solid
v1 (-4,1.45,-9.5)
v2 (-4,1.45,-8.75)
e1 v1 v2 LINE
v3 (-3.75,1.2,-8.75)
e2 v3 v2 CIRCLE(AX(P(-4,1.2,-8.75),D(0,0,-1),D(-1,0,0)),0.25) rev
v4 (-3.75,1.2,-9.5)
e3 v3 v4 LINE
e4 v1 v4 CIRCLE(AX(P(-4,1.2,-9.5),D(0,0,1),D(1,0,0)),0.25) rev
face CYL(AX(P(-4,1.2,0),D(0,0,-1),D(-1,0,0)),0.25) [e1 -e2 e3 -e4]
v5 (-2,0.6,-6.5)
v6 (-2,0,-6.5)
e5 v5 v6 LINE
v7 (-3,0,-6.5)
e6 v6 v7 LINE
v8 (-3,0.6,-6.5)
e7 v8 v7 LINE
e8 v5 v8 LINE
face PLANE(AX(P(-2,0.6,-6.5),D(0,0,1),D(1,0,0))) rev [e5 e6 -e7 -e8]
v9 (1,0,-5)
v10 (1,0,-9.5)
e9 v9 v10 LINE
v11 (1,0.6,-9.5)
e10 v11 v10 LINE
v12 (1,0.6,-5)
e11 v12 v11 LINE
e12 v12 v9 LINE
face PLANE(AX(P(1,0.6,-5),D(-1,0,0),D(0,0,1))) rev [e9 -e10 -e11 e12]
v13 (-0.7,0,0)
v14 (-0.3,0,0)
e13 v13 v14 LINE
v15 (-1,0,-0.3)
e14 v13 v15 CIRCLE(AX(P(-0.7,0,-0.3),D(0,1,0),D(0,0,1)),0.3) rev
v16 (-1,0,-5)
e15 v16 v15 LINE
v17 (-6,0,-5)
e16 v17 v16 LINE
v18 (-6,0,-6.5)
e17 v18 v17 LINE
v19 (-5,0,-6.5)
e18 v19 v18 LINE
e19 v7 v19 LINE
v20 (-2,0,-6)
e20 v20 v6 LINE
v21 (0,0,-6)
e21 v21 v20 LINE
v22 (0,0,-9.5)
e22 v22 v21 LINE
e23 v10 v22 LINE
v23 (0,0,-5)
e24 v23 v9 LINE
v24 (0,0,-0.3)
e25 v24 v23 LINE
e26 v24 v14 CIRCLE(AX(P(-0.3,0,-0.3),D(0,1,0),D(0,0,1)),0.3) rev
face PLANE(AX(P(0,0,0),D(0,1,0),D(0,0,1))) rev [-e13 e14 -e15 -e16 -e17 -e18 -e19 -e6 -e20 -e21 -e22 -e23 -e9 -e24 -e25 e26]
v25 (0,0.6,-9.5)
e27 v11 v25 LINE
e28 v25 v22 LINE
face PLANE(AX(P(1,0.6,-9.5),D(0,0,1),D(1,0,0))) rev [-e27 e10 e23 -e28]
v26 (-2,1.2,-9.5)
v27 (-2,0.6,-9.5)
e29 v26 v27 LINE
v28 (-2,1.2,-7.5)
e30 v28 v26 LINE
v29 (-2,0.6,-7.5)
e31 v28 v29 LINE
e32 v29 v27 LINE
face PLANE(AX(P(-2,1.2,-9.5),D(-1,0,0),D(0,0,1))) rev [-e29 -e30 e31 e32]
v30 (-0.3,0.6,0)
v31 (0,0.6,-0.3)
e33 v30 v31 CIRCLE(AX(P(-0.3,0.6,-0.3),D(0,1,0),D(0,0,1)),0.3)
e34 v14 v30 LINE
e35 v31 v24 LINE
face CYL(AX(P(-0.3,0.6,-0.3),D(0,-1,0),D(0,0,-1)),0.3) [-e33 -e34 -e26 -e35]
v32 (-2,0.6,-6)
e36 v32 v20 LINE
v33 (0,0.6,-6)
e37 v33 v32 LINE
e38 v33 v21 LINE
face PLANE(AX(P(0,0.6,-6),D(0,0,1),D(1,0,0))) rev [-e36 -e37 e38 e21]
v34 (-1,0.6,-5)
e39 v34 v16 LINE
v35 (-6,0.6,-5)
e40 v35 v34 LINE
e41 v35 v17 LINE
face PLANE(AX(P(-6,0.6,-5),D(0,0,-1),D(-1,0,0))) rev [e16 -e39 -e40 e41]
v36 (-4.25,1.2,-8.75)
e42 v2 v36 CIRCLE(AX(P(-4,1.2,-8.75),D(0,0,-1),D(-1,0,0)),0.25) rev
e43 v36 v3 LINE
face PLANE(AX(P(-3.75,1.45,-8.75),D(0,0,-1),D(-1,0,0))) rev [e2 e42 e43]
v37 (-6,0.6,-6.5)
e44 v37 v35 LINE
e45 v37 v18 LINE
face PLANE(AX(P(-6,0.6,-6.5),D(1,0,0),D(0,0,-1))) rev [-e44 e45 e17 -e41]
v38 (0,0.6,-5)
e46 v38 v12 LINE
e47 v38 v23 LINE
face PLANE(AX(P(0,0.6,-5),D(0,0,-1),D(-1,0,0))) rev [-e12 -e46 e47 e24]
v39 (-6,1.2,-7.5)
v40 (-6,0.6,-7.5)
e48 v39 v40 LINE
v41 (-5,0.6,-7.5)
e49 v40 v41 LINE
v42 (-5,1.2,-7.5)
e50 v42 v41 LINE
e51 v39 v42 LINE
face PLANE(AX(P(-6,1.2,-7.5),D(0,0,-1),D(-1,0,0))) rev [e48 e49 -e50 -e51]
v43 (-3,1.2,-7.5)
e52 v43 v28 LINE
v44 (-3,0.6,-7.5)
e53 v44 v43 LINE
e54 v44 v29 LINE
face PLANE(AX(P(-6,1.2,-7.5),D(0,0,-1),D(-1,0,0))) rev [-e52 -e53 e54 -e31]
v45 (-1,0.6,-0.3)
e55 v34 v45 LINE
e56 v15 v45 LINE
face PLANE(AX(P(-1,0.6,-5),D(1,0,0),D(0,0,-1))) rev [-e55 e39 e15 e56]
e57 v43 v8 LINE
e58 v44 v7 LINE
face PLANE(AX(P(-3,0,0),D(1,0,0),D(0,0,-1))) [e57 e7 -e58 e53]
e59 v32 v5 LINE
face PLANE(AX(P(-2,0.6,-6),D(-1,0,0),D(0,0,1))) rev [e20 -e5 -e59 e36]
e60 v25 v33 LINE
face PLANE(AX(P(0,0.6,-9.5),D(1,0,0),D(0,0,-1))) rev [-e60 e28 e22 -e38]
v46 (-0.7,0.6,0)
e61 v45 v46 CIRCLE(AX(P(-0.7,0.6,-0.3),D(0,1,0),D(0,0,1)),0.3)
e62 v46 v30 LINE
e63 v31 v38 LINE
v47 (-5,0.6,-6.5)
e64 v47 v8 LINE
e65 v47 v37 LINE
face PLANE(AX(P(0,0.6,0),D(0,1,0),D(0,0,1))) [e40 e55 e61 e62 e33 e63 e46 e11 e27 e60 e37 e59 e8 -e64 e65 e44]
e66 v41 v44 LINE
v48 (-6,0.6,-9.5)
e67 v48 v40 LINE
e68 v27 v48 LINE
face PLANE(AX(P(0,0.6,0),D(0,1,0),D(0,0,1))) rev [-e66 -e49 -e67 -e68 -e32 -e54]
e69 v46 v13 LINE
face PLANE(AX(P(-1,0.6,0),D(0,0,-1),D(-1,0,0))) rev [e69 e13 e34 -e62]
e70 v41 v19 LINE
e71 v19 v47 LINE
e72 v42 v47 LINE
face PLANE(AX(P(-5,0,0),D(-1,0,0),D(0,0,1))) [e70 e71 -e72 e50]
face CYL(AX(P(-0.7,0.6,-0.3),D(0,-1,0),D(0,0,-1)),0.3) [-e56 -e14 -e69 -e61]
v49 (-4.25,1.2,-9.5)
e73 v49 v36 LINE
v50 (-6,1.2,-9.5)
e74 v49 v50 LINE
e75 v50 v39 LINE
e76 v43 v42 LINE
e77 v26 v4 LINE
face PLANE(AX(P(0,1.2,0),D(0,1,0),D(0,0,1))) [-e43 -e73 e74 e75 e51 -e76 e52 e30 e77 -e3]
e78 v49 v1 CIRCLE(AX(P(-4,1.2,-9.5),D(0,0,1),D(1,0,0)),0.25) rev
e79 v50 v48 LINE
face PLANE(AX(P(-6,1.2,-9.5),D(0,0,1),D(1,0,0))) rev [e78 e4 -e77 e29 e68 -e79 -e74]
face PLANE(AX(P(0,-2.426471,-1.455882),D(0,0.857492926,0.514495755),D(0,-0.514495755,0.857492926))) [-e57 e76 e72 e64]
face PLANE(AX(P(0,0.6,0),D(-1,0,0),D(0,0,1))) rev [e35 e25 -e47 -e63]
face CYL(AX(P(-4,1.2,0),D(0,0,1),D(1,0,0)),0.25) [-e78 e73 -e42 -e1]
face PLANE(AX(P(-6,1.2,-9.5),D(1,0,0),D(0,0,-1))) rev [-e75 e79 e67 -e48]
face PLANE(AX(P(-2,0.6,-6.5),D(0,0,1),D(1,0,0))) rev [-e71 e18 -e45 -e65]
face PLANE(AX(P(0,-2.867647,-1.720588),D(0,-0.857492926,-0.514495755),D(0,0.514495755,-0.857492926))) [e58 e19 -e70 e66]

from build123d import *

# Parameters (mm, degrees)
BOSS_EXTRUDE1_DEPTH = 0.6
SKETCH2_W           = 4
SKETCH2_H           = 2
BOSS_EXTRUDE2_DEPTH = 0.6
FILLET1_R           = 0.3
SKETCH5_W           = 0.5
SKETCH5_H           = 0.75
BOSS_EXTRUDE3_DEPTH = 0.25
FILLET2_R           = 0.25


with BuildPart() as part:
    # Sketch1 → Boss-Extrude1 (new body)
    with BuildSketch(Plane(origin=(0, 0, 0), x_dir=(1, 0, 0), z_dir=(0, 1, 0))):
        Polygon((0, 0), (0, 5), (1, 5), (1, 9.5), (0, 9.5), (0, 6), (-2, 6), (-2, 6.5), (-6, 6.5), (-6, 5), (-1, 5), (-1, 0), align=None)
    extrude(amount=BOSS_EXTRUDE1_DEPTH)



with BuildPart() as body_2:
    # Sketch2 → Boss-Extrude2 (new body)
    with BuildSketch(Plane(origin=(0, 0.6, 0), x_dir=(1, 0, 0), z_dir=(0, 1, 0))):
        with Locations((-4, 8.5)):
            Rectangle(SKETCH2_W, SKETCH2_H)
    extrude(amount=BOSS_EXTRUDE2_DEPTH)


with BuildPart() as part_1:
    add(part.part)

    add(body_2.part)  # Loft1 merges body 2
    # Sketch3 → Loft1 section 0
    with BuildSketch(Plane.XY.offset(-7.5)):
        with BuildLine():
            Line((-3, 1.2), (-5, 1.2))
            Line((-5, 1.2), (-5, 0.6))
            Line((-5, 0.6), (-3, 0.6))
            Line((-3, 0.6), (-3, 1.2))
        make_face()
    # Sketch4 → Loft1 section 1
    with BuildSketch(Plane(origin=(0, 0, -6.5), x_dir=(-1, 0, 0), z_dir=(0, 0, -1))):
        with BuildLine():
            Line((3, 0.6), (5, 0.6))
            Line((5, 0.6), (5, 0))
            Line((5, 0), (3, 0))
            Line((3, 0), (3, 0.6))
        make_face()
    loft()

    # Fillet1
    fillet1_edges = [part_1.edges().sort_by_distance(p)[0] for p in [
        (-1, 0.3, 0),
        (0, 0.3, 0),
    ]]
    fillet(fillet1_edges, radius=FILLET1_R)

    # Sketch5 → Boss-Extrude3 (add)
    with BuildSketch(Plane(origin=(0, 1.2, 0), x_dir=(1, 0, 0), z_dir=(0, 1, 0))):
        with Locations((-4, 9.125)):
            Rectangle(SKETCH5_W, SKETCH5_H)
    extrude(amount=BOSS_EXTRUDE3_DEPTH)

    # Fillet2
    fillet2_edges = [part_1.edges().sort_by_distance(p)[0] for p in [
        (-3.75, 1.45, -9.125),
        (-4.25, 1.45, -9.125),
    ]]
    fillet(fillet2_edges, radius=FILLET2_R - 0.0001)  # a hair under: the kernel refuses the full size


solid = part_1.part
